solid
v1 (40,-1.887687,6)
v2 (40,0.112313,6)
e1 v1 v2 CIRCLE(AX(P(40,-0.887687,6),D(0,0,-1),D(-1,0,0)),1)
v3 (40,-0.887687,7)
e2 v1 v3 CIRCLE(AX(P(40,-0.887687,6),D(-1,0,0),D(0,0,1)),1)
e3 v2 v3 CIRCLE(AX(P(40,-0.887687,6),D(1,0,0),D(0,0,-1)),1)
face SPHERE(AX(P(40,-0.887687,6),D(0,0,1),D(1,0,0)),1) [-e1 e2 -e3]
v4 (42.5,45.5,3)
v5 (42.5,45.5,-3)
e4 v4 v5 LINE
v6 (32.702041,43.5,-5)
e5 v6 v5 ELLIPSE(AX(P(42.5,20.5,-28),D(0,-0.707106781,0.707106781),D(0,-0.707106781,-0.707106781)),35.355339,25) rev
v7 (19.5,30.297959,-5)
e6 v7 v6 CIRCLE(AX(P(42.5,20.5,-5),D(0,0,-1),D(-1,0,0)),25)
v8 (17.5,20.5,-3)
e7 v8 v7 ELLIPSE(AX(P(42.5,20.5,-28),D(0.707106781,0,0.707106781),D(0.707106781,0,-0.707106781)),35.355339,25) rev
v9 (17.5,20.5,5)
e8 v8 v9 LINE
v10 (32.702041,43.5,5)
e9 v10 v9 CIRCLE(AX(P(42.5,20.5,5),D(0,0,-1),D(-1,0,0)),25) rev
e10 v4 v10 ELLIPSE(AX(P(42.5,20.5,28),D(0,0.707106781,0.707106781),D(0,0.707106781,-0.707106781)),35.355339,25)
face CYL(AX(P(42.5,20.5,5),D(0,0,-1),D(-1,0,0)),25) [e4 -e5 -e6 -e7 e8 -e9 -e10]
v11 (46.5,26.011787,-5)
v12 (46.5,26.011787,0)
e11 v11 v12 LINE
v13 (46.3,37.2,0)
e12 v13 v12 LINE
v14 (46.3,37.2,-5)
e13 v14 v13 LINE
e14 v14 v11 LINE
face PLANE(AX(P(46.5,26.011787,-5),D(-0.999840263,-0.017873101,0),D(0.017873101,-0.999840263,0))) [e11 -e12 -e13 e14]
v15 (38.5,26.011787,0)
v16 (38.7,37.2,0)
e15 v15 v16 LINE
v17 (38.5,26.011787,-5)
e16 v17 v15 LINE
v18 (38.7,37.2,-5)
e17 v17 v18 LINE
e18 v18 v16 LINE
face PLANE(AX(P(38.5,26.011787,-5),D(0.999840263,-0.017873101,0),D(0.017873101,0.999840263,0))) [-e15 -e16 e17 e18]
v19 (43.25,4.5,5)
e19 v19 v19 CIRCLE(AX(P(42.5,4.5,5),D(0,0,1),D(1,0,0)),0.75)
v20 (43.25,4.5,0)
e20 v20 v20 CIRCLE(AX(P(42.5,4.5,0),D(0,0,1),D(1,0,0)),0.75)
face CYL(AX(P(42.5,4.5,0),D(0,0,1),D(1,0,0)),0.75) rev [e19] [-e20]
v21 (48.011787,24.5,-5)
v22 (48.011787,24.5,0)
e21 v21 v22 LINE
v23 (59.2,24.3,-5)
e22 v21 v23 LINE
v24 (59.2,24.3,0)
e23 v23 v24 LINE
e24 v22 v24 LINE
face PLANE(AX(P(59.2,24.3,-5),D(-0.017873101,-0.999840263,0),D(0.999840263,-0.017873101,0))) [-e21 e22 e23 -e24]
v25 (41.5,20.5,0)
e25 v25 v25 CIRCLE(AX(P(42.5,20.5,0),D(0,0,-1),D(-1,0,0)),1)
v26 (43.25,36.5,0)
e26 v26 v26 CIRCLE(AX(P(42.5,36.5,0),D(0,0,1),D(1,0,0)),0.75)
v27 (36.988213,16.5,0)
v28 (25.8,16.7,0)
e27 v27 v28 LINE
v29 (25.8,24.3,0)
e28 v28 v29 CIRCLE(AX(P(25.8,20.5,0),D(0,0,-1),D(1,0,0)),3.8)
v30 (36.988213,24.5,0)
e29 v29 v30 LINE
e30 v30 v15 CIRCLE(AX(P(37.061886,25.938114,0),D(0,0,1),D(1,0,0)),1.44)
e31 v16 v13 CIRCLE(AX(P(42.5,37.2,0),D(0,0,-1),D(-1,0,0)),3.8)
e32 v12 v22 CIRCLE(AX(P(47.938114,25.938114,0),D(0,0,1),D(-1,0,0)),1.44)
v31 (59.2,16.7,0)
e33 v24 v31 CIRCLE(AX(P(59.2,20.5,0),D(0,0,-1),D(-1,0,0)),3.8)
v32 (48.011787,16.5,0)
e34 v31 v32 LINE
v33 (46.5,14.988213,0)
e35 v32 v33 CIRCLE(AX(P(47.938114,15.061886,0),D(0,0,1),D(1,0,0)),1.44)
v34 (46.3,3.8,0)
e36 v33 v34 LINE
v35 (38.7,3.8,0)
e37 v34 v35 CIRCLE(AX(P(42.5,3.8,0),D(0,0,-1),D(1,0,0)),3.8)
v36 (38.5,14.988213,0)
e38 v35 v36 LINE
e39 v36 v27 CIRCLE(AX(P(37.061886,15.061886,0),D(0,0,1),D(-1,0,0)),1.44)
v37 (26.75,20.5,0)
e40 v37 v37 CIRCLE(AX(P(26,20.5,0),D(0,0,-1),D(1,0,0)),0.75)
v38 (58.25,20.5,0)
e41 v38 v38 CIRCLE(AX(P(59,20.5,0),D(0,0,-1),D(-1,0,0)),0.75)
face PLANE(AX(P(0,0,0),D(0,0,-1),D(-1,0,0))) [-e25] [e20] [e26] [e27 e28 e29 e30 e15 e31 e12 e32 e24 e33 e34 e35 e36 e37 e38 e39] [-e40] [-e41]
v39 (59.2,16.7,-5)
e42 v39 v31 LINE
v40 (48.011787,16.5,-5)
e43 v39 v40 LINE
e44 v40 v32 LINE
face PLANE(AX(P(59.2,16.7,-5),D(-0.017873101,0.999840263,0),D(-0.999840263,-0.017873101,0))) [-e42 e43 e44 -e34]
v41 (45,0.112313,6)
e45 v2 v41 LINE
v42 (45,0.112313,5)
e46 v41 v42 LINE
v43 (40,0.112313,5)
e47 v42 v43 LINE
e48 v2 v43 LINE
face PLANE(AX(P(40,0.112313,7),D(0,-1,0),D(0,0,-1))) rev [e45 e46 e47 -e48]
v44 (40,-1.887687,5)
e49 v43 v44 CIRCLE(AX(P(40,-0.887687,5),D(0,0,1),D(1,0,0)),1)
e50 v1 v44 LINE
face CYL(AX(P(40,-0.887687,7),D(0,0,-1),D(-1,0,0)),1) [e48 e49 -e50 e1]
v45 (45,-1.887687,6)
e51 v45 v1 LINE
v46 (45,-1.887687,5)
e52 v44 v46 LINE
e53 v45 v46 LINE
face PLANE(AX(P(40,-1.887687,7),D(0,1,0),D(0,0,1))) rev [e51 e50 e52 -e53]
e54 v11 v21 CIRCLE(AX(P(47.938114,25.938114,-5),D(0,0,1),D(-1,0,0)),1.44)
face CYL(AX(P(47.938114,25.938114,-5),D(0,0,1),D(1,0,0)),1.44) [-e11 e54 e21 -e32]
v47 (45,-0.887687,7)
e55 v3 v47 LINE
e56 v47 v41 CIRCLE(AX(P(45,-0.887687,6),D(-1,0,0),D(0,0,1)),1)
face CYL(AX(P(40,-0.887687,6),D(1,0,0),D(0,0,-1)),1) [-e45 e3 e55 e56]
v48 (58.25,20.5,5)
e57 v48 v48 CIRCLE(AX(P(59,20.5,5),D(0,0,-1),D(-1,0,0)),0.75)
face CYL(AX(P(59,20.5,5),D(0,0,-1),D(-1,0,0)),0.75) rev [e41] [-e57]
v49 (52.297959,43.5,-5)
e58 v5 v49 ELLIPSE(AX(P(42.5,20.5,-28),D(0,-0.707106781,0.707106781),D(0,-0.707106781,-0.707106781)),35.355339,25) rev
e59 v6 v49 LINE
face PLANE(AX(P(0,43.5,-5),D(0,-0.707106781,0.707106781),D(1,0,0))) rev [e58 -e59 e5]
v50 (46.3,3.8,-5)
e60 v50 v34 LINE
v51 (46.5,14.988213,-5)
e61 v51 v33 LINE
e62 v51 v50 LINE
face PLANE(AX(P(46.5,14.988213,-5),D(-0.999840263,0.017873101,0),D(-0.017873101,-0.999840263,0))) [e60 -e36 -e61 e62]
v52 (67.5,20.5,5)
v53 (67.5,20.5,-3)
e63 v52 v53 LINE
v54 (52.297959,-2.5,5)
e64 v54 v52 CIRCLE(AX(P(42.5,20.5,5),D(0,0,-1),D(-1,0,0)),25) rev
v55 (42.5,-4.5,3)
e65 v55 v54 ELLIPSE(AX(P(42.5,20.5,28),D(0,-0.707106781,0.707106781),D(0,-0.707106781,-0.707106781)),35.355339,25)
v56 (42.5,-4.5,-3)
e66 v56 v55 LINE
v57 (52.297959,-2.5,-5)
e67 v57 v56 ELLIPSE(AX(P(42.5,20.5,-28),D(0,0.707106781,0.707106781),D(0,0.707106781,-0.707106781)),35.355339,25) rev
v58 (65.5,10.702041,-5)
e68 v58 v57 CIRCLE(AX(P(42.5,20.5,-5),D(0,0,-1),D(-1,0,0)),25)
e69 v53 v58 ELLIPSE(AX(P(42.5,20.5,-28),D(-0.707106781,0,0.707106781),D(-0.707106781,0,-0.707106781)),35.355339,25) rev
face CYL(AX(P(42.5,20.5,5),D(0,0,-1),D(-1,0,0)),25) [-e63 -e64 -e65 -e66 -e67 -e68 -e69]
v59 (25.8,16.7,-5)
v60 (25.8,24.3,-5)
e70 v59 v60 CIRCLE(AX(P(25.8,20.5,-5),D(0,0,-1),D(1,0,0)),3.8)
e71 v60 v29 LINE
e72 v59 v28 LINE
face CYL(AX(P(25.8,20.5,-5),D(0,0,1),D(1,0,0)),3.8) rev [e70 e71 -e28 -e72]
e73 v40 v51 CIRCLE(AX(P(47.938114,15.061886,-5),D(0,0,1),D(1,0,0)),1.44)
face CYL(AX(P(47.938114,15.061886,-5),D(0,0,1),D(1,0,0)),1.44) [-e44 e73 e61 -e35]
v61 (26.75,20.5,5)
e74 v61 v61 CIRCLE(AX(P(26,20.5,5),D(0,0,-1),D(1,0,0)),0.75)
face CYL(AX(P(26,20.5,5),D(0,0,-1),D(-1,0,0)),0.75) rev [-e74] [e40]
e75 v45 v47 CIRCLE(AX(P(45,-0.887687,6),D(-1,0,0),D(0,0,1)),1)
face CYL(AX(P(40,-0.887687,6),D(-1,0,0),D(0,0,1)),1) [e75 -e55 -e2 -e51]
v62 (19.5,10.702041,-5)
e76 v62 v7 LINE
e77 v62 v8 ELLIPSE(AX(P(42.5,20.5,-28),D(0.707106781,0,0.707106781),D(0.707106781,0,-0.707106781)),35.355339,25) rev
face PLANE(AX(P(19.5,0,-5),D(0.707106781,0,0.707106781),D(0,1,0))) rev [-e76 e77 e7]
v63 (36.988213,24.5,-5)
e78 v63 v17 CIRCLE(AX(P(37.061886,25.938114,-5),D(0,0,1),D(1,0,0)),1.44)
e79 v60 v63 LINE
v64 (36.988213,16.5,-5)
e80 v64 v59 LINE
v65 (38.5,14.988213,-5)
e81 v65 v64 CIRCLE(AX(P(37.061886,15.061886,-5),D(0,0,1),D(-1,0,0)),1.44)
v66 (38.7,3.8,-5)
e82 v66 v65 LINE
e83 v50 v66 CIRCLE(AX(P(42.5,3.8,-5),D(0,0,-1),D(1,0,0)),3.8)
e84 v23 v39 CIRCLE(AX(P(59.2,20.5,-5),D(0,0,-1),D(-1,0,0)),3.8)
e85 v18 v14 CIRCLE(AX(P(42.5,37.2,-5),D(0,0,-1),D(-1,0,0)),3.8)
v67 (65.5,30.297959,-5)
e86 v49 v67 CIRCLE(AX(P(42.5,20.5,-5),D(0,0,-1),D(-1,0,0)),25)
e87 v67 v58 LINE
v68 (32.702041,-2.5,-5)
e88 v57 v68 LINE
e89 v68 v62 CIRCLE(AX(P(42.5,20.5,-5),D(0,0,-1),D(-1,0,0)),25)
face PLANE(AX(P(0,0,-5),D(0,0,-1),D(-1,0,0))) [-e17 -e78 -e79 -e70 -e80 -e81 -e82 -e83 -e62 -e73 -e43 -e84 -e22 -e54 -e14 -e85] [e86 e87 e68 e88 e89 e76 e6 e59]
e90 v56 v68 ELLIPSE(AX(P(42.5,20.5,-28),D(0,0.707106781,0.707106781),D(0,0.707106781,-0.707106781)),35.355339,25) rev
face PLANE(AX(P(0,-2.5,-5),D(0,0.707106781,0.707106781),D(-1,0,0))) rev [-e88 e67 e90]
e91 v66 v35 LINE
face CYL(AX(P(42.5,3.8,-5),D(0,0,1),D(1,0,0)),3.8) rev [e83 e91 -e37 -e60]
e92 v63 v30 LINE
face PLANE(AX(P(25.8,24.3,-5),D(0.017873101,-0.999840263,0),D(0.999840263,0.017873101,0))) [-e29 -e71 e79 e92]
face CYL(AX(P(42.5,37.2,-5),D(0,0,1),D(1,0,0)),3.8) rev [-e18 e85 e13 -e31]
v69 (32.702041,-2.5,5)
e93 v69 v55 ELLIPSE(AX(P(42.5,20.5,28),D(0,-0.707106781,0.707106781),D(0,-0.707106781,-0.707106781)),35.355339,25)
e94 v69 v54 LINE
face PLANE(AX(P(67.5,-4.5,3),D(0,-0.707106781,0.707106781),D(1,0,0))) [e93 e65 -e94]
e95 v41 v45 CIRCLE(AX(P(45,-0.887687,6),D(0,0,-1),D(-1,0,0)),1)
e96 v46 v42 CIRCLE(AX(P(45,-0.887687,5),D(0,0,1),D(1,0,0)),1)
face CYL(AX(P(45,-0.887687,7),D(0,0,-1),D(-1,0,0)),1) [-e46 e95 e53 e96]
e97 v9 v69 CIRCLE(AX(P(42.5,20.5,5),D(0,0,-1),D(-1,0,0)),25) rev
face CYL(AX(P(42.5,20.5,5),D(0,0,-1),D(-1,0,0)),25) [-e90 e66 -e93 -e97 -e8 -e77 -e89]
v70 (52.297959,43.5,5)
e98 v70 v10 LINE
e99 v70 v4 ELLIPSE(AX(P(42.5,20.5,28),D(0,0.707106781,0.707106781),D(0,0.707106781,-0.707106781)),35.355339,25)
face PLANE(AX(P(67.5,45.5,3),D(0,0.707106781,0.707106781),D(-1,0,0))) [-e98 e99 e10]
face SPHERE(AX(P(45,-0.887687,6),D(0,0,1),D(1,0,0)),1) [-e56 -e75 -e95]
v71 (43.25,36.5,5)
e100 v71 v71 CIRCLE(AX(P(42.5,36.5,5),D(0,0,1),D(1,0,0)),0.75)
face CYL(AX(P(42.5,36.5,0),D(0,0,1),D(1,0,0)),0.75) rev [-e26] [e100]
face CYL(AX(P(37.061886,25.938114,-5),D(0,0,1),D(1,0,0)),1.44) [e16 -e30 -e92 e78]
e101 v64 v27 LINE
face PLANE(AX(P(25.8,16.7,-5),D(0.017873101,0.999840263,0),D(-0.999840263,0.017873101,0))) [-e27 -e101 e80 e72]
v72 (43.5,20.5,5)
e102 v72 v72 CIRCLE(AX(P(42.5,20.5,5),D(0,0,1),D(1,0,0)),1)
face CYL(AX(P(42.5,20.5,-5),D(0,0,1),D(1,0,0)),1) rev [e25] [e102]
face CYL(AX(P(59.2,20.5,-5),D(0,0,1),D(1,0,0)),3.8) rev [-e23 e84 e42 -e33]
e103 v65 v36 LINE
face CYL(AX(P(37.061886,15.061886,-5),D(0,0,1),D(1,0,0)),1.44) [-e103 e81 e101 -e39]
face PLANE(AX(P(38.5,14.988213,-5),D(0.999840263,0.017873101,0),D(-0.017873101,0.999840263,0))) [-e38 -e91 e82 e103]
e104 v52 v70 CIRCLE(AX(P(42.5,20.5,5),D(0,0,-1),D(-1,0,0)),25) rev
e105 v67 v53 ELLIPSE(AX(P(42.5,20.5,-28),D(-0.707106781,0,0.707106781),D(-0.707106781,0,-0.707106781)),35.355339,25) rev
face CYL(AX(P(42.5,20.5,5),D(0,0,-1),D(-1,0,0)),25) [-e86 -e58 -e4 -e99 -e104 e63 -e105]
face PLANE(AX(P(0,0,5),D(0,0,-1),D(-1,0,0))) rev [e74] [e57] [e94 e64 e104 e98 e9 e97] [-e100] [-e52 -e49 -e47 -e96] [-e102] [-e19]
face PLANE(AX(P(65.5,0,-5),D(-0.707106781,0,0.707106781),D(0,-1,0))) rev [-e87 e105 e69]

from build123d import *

# Parameters (mm, degrees)
SKETCH10_W          = 50
SKETCH10_H          = 50
BOSS_EXTRUDE7_DEPTH = 5
SKETCH9_W           = 50
SKETCH9_H           = 50
BOSS_EXTRUDE8_DEPTH = 5
SKETCH11_R          = 0.75
CUT_EXTRUDE5_DEPTH  = 5
CHAMFER1_SIZE       = 2
SKETCH12_R          = 1
CUT_EXTRUDE6_DEPTH  = 10
SKETCH14_R          = 0.75
CUT_EXTRUDE8_DEPTH  = 5
BOSS_EXTRUDE9_DEPTH = 2
FILLET1_R           = 1
FILLET2_R           = 25


# Some blends are built 0.0001 mm under size
with BuildPart() as part:
    # Sketch10 → Boss-Extrude7 (new body)
    with BuildSketch(Plane(origin=(0, 0, 0), x_dir=(-1, 0, 0), z_dir=(0, 0, -1))):
        with Locations((-42.5, 20.5)):
            Rectangle(SKETCH10_W, SKETCH10_H)
    extrude(amount=-BOSS_EXTRUDE7_DEPTH)

    # Sketch9 → Boss-Extrude8 (add)
    with BuildSketch(Plane(origin=(0, 0, 0), x_dir=(-1, 0, 0), z_dir=(0, 0, -1))):
        with Locations((-42.5, 20.5)):
            Rectangle(SKETCH9_W, SKETCH9_H)
        with BuildLine():
            Line((-59.2, 24.3), (-48.011787453, 24.5))
            ThreePointArc((-48.011787453, 24.5), (-46.919880362, 24.919880362), (-46.5, 26.011787453))
            Line((-46.5, 26.011787453), (-46.3, 37.2))
            ThreePointArc((-46.3, 37.2), (-42.5, 41), (-38.7, 37.2))
            Line((-38.7, 37.2), (-38.5, 26.011787453))
            ThreePointArc((-38.5, 26.011787453), (-38.080119638, 24.919880362), (-36.988212547, 24.5))
            Line((-36.988212547, 24.5), (-25.8, 24.3))
            ThreePointArc((-25.8, 24.3), (-22, 20.5), (-25.8, 16.7))
            Line((-25.8, 16.7), (-36.988212547, 16.5))
            ThreePointArc((-36.988212547, 16.5), (-38.080119638, 16.080119638), (-38.5, 14.988212547))
            Line((-38.5, 14.988212547), (-38.7, 3.8))
            ThreePointArc((-38.7, 3.8), (-42.5, 0), (-46.3, 3.8))
            Line((-46.3, 3.8), (-46.5, 14.988212547))
            ThreePointArc((-46.5, 14.988212547), (-46.919880362, 16.080119638), (-48.011787453, 16.5))
            Line((-48.011787453, 16.5), (-59.2, 16.7))
            ThreePointArc((-59.2, 16.7), (-63, 20.5), (-59.2, 24.3))
        make_face(mode=Mode.SUBTRACT)
    extrude(amount=BOSS_EXTRUDE8_DEPTH)

    # Sketch11 → Cut-Extrude5 (cut)
    with BuildSketch(Plane(origin=(0, 0, 0), x_dir=(-1, 0, 0), z_dir=(0, 0, -1))):
        with Locations((-59, 20.5)):
            Circle(SKETCH11_R)
        with Locations(Location((-26, 20.5, 0), (0, 0, 180))):
            Circle(SKETCH11_R)
    extrude(amount=-CUT_EXTRUDE5_DEPTH, mode=Mode.SUBTRACT)

    # Chamfer1
    chamfer1_edges = [part.edges().sort_by_distance(p)[0] for p in [
        (42.5, 45.5, 5),
        (67.5, 20.5, -5),
        (42.5, -4.5, -5),
        (17.5, 20.5, -5),
        (42.5, 45.5, -5),
        (42.5, -4.5, 5),
    ]]
    chamfer(chamfer1_edges, length=CHAMFER1_SIZE)

    # Sketch12 → Cut-Extrude6 (cut)
    with BuildSketch(Plane.XY.offset(5)):
        with Locations((42.5, 20.5)):
            Circle(SKETCH12_R)
    extrude(amount=-CUT_EXTRUDE6_DEPTH, mode=Mode.SUBTRACT)

    # Sketch14 → Cut-Extrude8 (cut)
    with BuildSketch(Plane.XY.offset(5)):
        with Locations((42.5, 36.5)):
            Circle(SKETCH14_R)
        with Locations((42.5, 4.5)):
            Circle(SKETCH14_R)
    extrude(amount=-CUT_EXTRUDE8_DEPTH, mode=Mode.SUBTRACT)

    # Sketch15 → Boss-Extrude9 (add)
    with BuildSketch(Plane.XY.offset(5)):
        with BuildLine():
            Line((40, 0.112312602), (45, 0.112312602))
            ThreePointArc((45, 0.112312602), (46, -0.887687398), (45, -1.887687398))
            Line((45, -1.887687398), (40, -1.887687398))
            ThreePointArc((40, -1.887687398), (39, -0.887687398), (40, 0.112312602))
        make_face()
    extrude(amount=BOSS_EXTRUDE9_DEPTH)

    # Fillet1
    fillet1_edges = [part.edges().sort_by_distance(p)[0] for p in [
        (39, -0.887687398, 7),
        (42.5, -1.887687398, 7),
        (46, -0.887687398, 7),
        (42.5, 0.112312602, 7),
    ]]
    fillet(fillet1_edges, radius=FILLET1_R - 0.0001)  # a hair under: the kernel refuses the full size

    # Fillet2
    # the kernel refuses this fillet: 25 mm, written as the material it takes off along each edge
    with BuildSketch(Plane(origin=(17.5, 45.5, -65.5), x_dir=(0, -1, 0), z_dir=(0, 0, 1)), Plane(origin=(67.5, 45.5, 65.5), x_dir=(0, -1, 0), z_dir=(0, 0, -1))) as fillet2_piece_1:
        with BuildLine():
            CenterArc((FILLET2_R, FILLET2_R), FILLET2_R, 180, 90)
            Line((0, FILLET2_R), (0, 0))
            Line((0, 0), (FILLET2_R, 0))
        make_face()
    extrude(amount=131, mode=Mode.SUBTRACT)
    with BuildSketch(Plane(origin=(67.5, -4.5, 65.5), x_dir=(0, 1, 0), z_dir=(0, 0, -1)), Plane(origin=(17.5, -4.5, -65.5), x_dir=(0, 1, 0), z_dir=(0, 0, 1))) as fillet2_piece_2:
        with BuildLine():
            CenterArc((FILLET2_R, -FILLET2_R), FILLET2_R, 90, 90)
            Line((0, -FILLET2_R), (0, 0))
            Line((0, 0), (FILLET2_R, 0))
        make_face()
    extrude(amount=131, mode=Mode.SUBTRACT)


solid = part.part
